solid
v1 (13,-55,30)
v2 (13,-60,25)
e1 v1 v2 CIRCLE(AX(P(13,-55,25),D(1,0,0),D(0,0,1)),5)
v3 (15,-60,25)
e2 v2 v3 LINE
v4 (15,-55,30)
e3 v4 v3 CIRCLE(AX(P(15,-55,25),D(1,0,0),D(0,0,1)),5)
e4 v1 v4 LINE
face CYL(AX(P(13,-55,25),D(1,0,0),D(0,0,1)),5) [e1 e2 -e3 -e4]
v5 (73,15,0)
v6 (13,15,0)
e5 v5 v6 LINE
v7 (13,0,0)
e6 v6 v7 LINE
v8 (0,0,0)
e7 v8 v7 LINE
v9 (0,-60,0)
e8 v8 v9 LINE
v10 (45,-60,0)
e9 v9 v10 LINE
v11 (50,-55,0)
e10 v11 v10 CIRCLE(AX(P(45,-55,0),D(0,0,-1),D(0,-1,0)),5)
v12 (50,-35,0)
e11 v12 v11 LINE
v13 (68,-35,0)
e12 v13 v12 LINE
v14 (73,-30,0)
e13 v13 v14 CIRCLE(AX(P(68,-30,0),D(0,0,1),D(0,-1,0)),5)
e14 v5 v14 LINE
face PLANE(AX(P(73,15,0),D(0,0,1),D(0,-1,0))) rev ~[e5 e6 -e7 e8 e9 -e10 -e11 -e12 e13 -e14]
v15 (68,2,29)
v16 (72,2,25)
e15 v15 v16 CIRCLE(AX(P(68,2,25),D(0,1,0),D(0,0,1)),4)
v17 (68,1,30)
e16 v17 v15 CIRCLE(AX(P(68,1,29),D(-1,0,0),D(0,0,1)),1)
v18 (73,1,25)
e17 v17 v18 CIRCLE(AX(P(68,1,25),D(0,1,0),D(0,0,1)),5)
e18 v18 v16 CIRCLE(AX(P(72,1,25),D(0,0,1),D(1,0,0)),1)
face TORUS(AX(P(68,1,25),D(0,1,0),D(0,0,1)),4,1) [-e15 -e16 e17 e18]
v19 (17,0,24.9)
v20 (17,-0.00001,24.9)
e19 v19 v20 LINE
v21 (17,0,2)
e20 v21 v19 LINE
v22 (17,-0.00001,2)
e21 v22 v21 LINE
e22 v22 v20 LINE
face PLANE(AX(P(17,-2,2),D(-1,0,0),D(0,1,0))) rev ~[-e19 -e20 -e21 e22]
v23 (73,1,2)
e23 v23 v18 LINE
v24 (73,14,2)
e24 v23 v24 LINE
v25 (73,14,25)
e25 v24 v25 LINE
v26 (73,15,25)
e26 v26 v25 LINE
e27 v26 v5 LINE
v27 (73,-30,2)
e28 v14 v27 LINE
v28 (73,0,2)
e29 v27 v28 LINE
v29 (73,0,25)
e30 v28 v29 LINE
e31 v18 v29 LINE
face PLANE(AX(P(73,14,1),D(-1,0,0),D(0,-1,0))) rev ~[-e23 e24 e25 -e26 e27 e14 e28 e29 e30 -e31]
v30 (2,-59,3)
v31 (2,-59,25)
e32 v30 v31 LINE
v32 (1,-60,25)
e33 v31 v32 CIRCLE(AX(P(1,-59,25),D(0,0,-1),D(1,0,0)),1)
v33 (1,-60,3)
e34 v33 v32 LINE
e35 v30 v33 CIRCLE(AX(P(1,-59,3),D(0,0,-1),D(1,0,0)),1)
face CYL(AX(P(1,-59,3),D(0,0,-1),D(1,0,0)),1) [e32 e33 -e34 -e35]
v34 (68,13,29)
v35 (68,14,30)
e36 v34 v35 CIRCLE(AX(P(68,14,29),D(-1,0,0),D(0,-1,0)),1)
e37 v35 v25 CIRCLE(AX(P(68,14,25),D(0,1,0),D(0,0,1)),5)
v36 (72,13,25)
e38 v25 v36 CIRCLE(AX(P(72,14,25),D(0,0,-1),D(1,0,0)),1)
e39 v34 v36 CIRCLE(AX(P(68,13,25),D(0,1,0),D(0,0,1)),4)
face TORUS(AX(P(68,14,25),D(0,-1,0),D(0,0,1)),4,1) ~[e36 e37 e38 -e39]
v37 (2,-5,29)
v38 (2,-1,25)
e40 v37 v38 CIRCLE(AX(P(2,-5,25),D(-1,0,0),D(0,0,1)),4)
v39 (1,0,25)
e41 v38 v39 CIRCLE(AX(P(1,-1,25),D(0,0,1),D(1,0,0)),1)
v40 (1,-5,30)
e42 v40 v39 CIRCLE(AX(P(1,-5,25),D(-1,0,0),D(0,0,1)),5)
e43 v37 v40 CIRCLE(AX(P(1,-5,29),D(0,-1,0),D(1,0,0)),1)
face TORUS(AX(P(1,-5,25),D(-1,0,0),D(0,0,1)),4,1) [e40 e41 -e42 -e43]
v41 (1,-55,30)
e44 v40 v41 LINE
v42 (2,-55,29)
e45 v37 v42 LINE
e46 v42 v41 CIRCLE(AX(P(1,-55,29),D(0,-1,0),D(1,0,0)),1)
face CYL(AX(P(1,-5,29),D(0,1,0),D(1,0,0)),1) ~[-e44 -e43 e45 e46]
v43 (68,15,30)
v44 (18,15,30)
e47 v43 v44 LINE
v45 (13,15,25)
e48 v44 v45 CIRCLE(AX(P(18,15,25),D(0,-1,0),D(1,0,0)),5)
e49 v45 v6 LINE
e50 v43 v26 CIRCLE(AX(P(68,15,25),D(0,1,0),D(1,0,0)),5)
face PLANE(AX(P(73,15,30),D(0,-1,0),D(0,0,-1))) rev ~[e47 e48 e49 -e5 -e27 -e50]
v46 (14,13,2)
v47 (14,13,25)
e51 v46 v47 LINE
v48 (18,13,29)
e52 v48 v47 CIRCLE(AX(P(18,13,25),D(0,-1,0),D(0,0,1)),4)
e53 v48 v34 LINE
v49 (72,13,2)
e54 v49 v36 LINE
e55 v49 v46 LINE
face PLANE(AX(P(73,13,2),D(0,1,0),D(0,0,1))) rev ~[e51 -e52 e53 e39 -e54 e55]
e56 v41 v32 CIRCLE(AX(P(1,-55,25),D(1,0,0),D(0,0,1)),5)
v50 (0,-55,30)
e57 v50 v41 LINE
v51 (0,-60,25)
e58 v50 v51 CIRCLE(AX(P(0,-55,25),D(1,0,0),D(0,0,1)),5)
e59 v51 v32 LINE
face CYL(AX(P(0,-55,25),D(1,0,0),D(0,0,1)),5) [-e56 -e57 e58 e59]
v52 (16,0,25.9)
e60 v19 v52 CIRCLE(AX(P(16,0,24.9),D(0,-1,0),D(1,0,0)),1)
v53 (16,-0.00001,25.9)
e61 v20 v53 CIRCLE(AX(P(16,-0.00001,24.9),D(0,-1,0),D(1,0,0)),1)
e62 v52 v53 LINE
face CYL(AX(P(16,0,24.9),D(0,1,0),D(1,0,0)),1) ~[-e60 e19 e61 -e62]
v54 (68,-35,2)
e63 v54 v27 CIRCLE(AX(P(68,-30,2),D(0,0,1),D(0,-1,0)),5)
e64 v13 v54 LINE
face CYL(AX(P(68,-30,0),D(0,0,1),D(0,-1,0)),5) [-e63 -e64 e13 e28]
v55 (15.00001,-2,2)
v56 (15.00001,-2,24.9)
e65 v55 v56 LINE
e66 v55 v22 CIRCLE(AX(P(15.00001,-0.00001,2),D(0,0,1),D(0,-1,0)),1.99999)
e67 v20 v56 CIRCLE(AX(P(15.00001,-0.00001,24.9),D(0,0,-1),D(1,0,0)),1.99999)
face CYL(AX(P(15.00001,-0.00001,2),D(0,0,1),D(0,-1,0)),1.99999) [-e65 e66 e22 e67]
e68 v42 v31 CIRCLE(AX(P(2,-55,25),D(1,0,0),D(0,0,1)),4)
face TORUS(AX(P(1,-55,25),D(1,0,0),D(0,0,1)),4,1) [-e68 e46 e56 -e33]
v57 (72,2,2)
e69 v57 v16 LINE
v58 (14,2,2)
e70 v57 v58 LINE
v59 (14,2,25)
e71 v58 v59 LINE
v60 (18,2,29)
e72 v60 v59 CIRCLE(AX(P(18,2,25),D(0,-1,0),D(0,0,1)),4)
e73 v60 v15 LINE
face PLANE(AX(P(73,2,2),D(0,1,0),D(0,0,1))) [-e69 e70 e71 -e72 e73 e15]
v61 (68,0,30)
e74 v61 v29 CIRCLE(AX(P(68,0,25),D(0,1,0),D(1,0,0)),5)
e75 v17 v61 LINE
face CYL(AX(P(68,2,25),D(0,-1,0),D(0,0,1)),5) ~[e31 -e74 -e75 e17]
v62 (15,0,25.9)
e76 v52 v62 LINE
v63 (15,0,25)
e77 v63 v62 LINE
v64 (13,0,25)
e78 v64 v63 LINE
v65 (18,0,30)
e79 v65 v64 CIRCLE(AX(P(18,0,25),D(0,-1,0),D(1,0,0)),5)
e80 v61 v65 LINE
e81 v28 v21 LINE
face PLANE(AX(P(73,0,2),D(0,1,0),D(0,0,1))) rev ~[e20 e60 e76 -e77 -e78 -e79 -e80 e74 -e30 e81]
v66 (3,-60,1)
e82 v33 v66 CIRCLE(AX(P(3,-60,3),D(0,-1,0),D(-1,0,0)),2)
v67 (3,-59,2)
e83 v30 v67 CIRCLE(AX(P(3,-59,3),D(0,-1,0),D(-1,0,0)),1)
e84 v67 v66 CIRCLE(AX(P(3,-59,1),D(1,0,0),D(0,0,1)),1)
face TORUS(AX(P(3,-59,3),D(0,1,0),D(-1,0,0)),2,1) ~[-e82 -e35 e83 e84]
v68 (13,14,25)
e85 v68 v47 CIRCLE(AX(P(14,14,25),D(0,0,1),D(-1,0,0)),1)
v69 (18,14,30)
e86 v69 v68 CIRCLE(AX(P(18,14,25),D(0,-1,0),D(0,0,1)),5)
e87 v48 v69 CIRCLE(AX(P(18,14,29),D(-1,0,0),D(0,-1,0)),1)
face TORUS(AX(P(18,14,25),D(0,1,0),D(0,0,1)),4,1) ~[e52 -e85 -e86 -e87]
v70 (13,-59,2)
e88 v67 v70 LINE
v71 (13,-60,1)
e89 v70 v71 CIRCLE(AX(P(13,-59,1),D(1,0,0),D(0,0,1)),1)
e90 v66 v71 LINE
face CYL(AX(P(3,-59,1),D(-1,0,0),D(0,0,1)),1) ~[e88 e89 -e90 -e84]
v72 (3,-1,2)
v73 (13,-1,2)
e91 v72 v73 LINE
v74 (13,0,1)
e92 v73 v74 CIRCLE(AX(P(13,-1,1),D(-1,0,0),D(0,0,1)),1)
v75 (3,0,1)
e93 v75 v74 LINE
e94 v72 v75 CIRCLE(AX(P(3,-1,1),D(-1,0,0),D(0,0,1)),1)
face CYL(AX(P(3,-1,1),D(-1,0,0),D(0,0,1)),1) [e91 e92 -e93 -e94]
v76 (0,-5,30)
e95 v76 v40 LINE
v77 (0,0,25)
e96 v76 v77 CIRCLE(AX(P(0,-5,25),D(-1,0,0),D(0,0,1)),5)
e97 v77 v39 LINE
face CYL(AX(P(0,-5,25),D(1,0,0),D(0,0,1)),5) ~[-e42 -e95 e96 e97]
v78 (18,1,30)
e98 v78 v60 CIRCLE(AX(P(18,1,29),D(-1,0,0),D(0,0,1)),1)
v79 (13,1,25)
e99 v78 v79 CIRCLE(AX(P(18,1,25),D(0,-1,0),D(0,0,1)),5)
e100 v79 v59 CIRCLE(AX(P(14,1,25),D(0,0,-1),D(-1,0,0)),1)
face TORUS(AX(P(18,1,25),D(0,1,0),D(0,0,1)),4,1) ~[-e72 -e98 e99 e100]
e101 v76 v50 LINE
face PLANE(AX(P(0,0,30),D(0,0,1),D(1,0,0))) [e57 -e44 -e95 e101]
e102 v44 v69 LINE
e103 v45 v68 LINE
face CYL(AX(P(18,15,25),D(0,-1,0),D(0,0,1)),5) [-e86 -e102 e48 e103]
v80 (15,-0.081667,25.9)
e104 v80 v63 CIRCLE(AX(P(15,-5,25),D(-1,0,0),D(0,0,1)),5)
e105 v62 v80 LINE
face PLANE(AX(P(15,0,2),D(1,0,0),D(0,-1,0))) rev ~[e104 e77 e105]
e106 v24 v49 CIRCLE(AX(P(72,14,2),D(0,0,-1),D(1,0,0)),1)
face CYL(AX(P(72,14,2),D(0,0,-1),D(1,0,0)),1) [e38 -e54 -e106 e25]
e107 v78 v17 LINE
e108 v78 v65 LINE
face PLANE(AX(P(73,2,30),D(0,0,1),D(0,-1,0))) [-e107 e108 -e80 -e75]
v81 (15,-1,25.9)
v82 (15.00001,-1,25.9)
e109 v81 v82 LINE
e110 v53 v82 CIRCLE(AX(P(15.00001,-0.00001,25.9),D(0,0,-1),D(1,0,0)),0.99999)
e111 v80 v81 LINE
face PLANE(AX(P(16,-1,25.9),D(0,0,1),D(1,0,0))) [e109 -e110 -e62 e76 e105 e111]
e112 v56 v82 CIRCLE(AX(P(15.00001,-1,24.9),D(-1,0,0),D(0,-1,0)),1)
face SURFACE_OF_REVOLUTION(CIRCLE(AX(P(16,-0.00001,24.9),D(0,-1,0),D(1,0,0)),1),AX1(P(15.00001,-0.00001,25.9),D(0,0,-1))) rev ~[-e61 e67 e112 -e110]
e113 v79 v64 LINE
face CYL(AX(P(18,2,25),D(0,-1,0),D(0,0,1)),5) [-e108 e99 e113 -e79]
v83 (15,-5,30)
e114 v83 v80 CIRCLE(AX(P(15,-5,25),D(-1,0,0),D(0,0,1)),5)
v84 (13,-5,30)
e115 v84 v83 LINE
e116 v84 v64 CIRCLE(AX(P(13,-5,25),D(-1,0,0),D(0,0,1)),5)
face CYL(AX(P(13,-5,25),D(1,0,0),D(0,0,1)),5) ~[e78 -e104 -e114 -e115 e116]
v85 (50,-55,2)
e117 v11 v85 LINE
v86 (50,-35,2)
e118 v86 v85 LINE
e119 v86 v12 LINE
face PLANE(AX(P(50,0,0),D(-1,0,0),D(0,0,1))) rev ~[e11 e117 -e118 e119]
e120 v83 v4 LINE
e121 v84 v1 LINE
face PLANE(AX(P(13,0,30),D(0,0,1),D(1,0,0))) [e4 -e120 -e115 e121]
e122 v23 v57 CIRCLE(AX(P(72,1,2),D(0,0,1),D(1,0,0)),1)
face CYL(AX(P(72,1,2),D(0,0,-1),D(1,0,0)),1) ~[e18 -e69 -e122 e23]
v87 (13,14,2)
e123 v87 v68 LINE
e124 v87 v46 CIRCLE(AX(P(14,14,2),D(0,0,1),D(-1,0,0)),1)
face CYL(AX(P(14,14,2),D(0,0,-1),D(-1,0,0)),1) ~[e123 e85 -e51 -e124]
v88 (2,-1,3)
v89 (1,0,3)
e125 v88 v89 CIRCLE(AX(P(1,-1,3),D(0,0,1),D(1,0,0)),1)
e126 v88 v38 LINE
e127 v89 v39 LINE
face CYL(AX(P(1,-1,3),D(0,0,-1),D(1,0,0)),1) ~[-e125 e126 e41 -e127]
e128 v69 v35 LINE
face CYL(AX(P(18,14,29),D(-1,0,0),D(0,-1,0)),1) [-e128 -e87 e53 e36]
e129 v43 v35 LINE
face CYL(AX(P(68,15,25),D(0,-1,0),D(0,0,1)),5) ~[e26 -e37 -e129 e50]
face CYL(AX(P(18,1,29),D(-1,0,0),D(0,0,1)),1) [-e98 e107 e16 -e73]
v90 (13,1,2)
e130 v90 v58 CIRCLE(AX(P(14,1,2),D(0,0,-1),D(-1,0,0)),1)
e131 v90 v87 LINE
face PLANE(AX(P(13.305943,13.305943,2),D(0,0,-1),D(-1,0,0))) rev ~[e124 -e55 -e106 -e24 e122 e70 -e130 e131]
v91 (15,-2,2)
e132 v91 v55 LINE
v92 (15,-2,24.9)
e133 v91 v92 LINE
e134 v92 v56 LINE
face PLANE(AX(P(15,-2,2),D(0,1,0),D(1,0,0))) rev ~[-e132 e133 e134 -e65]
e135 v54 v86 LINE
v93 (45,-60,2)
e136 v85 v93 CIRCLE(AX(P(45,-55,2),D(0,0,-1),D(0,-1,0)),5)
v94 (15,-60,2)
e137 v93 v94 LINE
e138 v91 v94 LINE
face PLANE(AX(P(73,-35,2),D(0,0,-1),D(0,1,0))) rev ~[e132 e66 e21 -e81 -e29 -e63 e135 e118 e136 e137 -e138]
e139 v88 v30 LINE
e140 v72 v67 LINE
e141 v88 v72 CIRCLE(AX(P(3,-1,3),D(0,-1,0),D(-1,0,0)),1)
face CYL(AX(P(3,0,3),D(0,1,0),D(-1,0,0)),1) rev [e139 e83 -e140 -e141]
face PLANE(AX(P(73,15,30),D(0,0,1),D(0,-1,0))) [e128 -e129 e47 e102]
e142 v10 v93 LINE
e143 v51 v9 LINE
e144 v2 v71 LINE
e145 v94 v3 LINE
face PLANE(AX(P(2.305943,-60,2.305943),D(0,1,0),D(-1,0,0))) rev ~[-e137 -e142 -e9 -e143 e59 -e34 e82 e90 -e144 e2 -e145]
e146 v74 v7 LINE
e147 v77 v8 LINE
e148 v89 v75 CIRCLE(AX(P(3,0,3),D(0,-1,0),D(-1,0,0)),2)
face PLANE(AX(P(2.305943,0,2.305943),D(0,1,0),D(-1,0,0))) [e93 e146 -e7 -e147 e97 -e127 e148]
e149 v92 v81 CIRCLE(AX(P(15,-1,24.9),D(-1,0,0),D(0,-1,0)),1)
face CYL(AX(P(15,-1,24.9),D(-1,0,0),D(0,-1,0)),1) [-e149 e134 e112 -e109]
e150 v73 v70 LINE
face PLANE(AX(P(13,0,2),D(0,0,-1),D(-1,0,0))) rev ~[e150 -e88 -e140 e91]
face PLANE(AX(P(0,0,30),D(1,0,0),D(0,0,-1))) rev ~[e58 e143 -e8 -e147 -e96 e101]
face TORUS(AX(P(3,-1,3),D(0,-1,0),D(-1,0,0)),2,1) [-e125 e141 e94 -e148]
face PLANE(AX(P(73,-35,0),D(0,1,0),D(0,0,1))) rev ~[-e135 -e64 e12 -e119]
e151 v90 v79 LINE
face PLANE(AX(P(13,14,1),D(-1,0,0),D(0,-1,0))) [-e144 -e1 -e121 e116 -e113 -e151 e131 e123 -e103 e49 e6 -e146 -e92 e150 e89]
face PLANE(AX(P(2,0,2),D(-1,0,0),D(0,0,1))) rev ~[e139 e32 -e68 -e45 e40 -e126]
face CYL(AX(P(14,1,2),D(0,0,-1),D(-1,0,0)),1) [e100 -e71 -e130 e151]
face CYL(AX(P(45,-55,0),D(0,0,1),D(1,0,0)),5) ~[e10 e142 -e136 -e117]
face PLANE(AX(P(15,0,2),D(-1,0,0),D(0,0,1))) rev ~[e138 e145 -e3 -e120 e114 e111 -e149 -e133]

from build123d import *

# Parameters (mm, degrees)
F0_W         = 2
F0_H         = 2
F0_W_2       = 11
F0_H_2       = 28
F0_W_3       = 35
F1_DEPTH     = 60
F2_ANGLE     = -90
F4_R         = 5
F4_2_R       = 5
F6_DEPTH     = 23.9
F7_R         = 1.99999
F8_T1_DEPTH  = 60
F8_T3_DEPTH  = 23
F8_T5_DEPTH  = 1e-05
F8_T7_DEPTH  = 1e-05
F8_T9_DEPTH  = 50
F8_T12_ANGLE = 90
F8_T14_ANGLE = 90
F8_T16_ANGLE = 90
F8_T18_ANGLE = 90
F8_T20_ANGLE = 90
F8_T21_DEPTH = 50
F8_T23_DEPTH = 22
F8_T25_DEPTH = 10
F8_T28_ANGLE = 90
F8_T30_ANGLE = 90
F8_T32_ANGLE = 90
F8_T34_ANGLE = 90


# Not quite as in the source:
# - a fillet or chamfer that OpenCascade refuses, or shapes differently, is made with other operations: its cross-section is extruded or revolved along the edge and cut away or added
# - a fillet or chamfer is up to 0.001 mm smaller than in the source, because OpenCascade refuses the exact size


with BuildPart() as f1:
    # F0 (on Front) → F1 (new body)
    with BuildSketch(Plane.XZ):
        with Locations((1, 1)):
            Rectangle(F0_W, F0_H)
        with Locations((7.5, 1)):
            Rectangle(F0_W_2, F0_H)
        with Locations((1, 16)):
            Rectangle(F0_W, F0_H_2)
        with Locations((14, 1)):
            Rectangle(F0_W, F0_H)
        with Locations((32.5, 1)):
            Rectangle(F0_W_3, F0_H)
        with Locations((14, 16)):
            Rectangle(F0_W, F0_H_2)
    extrude(amount=F1_DEPTH)


with BuildPart() as f2_1:
    # F2: copy of F1
    add(f1.part.rotate(Axis((15, 0, 16), (0, 0, 1)), F2_ANGLE))


with BuildPart() as f2_1_1:
    # F3: moved
    add(f2_1.part.moved(Location((58, 0, 0))))

    # F4#2
    f4_2_edges = [f2_1_1.edges().sort_by_distance(p)[0] for p in [
        (73, 1, 30),
        (73, 14, 30),
        (13, 14, 30),
        (13, 1, 30),
        (73, -35, 1),
    ]]
    fillet(f4_2_edges, radius=F4_2_R)


with BuildPart() as f1_1:
    add(f1.part)

    # F4
    f4_edges = [f1_1.edges().sort_by_distance(p)[0] for p in [
        (14, 0, 30),
        (1, 0, 30),
        (14, -60, 30),
        (1, -60, 30),
        (50, -60, 1),
    ]]
    fillet(f4_edges, radius=F4_R)

    add(f2_1_1.part)  # F6 merges F2_1
    # F5 (on face) → F6 (join)
    with BuildSketch(Plane.XY.offset(2)):
        Polygon((16.8020091951, 0), (15, 0), (15, -2), (17, -2), (17, 0), align=None)
    extrude(amount=F6_DEPTH)

    # F7 (radius 2 in the source; OpenCascade refuses exactly that, so slightly less here)
    f7_edges = [f1_1.edges().sort_by_distance(p)[0] for p in [
        (17, -2, 13.95),
    ]]
    fillet(f7_edges, radius=F7_R)

    # F8: fillet of radius 1 on 19 edges, made by hand

    # F8_s2 → F8_t1 (join)
    with BuildSketch(Plane.XZ):
        with BuildLine():
            ThreePointArc((2, 3), (2.2928932188, 2.2928932188), (3, 2))
            Line((3, 2), (2, 2))
            Line((2, 2), (2, 3))
        make_face()
    extrude(amount=F8_T1_DEPTH)

    # F8_s4 → F8_t3 (cut)
    with BuildSketch(Plane.XY.offset(2)):
        with BuildLine():
            ThreePointArc((13, 1), (13.2928932188, 1.7071067812), (14, 2))
            Line((14, 2), (13, 2))
            Line((13, 2), (13, 1))
        make_face()
        with BuildLine():
            ThreePointArc((73, 14), (72.7071067812, 13.2928932188), (72, 13))
            Line((72, 13), (73, 13))
            Line((73, 13), (73, 14))
        make_face()
        with BuildLine():
            ThreePointArc((73, 1), (72.7071067812, 1.7071067812), (72, 2))
            Line((72, 2), (73, 2))
            Line((73, 2), (73, 1))
        make_face()
        with BuildLine():
            ThreePointArc((13, 14), (13.2928932188, 13.2928932188), (14, 13))
            Line((14, 13), (13, 13))
            Line((13, 13), (13, 14))
        make_face()
    extrude(amount=F8_T3_DEPTH, mode=Mode.SUBTRACT)

    # F8_s6 → F8_t5 (cut)
    with BuildSketch(Plane.YZ.offset(15)):
        with BuildLine():
            ThreePointArc((-2, 24.9), (-1.7071067812, 25.6071067812), (-1, 25.9))
            Line((-1, 25.9), (-2, 25.9))
            Line((-2, 25.9), (-2, 24.9))
        make_face()
    extrude(amount=F8_T5_DEPTH, mode=Mode.SUBTRACT)

    # F8_s8 → F8_t7 (cut)
    with BuildSketch(Plane.XZ):
        with BuildLine():
            ThreePointArc((17, 24.9), (16.7071067812, 25.6071067812), (16, 25.9))
            Line((16, 25.9), (17, 25.9))
            Line((17, 25.9), (17, 24.9))
        make_face()
    extrude(amount=F8_T7_DEPTH, mode=Mode.SUBTRACT)

    # F8_s10 → F8_t9 (cut)
    with BuildSketch(Plane.YZ.offset(18)):
        with BuildLine():
            ThreePointArc((13, 29), (13.2928932188, 29.7071067812), (14, 30))
            Line((14, 30), (13, 30))
            Line((13, 30), (13, 29))
        make_face()
        with BuildLine():
            ThreePointArc((1, 30), (1.7071067812, 29.7071067812), (2, 29))
            Line((2, 29), (2, 30))
            Line((2, 30), (1, 30))
        make_face()
    extrude(amount=F8_T9_DEPTH, mode=Mode.SUBTRACT)

    # F8_s11 → F8_t12 (revolve, cut)
    with BuildSketch(Plane.XZ.offset(1e-05)):
        with BuildLine():
            ThreePointArc((17, 24.9), (16.7071067812, 25.6071067812), (16, 25.9))
            Line((16, 25.9), (17, 25.9))
            Line((17, 25.9), (17, 24.9))
        make_face()
    revolve(axis=Axis((15.00001, -1e-05, 25.9), (0, 0, -1)), revolution_arc=F8_T12_ANGLE, mode=Mode.SUBTRACT)

    # F8_s13 → F8_t14 (revolve, cut)
    with BuildSketch(Plane.YZ.offset(68)):
        with BuildLine():
            ThreePointArc((1, 30), (1.7071067812, 29.7071067812), (2, 29))
            Line((2, 29), (2, 30))
            Line((2, 30), (1, 30))
        make_face()
    revolve(axis=Axis((68, 2, 25), (0, 1, 0)), revolution_arc=F8_T14_ANGLE, mode=Mode.SUBTRACT)

    # F8_s15 → F8_t16 (revolve, cut)
    with BuildSketch(Plane.YZ.offset(18)):
        with BuildLine():
            ThreePointArc((1, 30), (1.7071067812, 29.7071067812), (2, 29))
            Line((2, 29), (2, 30))
            Line((2, 30), (1, 30))
        make_face()
    revolve(axis=Axis((18, 2, 25), (0, -1, 0)), revolution_arc=F8_T16_ANGLE, mode=Mode.SUBTRACT)

    # F8_s17 → F8_t18 (revolve, cut)
    with BuildSketch(Plane.YZ.offset(68)):
        with BuildLine():
            ThreePointArc((14, 30), (13.2928932188, 29.7071067812), (13, 29))
            Line((13, 29), (13, 30))
            Line((13, 30), (14, 30))
        make_face()
    revolve(axis=Axis((68, 13, 25), (0, 1, 0)), revolution_arc=F8_T18_ANGLE, mode=Mode.SUBTRACT)

    # F8_s19 → F8_t20 (revolve, cut)
    with BuildSketch(Plane.YZ.offset(18)):
        with BuildLine():
            ThreePointArc((13, 29), (13.2928932188, 29.7071067812), (14, 30))
            Line((14, 30), (13, 30))
            Line((13, 30), (13, 29))
        make_face()
    revolve(axis=Axis((18, 13, 25), (0, -1, 0)), revolution_arc=F8_T20_ANGLE, mode=Mode.SUBTRACT)

    # F8_s22 → F8_t21 (cut)
    with BuildSketch(Plane.XZ.offset(5)):
        with BuildLine():
            ThreePointArc((2, 29), (1.7071067812, 29.7071067812), (1, 30))
            Line((1, 30), (2, 30))
            Line((2, 30), (2, 29))
        make_face()
    extrude(amount=F8_T21_DEPTH, mode=Mode.SUBTRACT)

    # F8_s24 → F8_t23 (cut)
    with BuildSketch(Plane.XY.offset(3)):
        with BuildLine():
            ThreePointArc((2, -1), (1.7071067812, -0.2928932188), (1, 0))
            Line((1, 0), (2, 0))
            Line((2, 0), (2, -1))
        make_face()
        with BuildLine():
            ThreePointArc((2, -59), (1.7071067812, -59.7071067812), (1, -60))
            Line((1, -60), (2, -60))
            Line((2, -60), (2, -59))
        make_face()
    extrude(amount=F8_T23_DEPTH, mode=Mode.SUBTRACT)

    # F8_s26 → F8_t25 (cut)
    with BuildSketch(Plane.YZ.offset(3)):
        with BuildLine():
            ThreePointArc((-59, 2), (-59.7071067812, 1.7071067812), (-60, 1))
            Line((-60, 1), (-60, 2))
            Line((-60, 2), (-59, 2))
        make_face()
        with BuildLine():
            ThreePointArc((-1, 2), (-0.2928932188, 1.7071067812), (0, 1))
            Line((0, 1), (0, 2))
            Line((0, 2), (-1, 2))
        make_face()
    extrude(amount=F8_T25_DEPTH, mode=Mode.SUBTRACT)

    # F8_s27 → F8_t28 (revolve, cut)
    with BuildSketch(Plane.XZ.offset(5)):
        with BuildLine():
            ThreePointArc((2, 29), (1.7071067812, 29.7071067812), (1, 30))
            Line((1, 30), (2, 30))
            Line((2, 30), (2, 29))
        make_face()
    revolve(axis=Axis((2, -5, 25), (-1, 0, 0)), revolution_arc=F8_T28_ANGLE, mode=Mode.SUBTRACT)

    # F8_s29 → F8_t30 (revolve, cut)
    with BuildSketch(Plane.XZ.offset(55)):
        with BuildLine():
            ThreePointArc((1, 30), (1.7071067812, 29.7071067812), (2, 29))
            Line((2, 29), (2, 30))
            Line((2, 30), (1, 30))
        make_face()
    revolve(axis=Axis((2, -55, 25), (1, 0, 0)), revolution_arc=F8_T30_ANGLE, mode=Mode.SUBTRACT)

    # F8_s31 → F8_t32 (revolve, cut)
    with BuildSketch(Plane.XY.offset(3)):
        with BuildLine():
            ThreePointArc((2, -1), (1.7071067812, -0.2928932188), (1, 0))
            Line((1, 0), (2, 0))
            Line((2, 0), (2, -1))
        make_face()
    revolve(axis=Axis((3, 0, 3), (0, -1, 0)), revolution_arc=F8_T32_ANGLE, mode=Mode.SUBTRACT)

    # F8_s33 → F8_t34 (revolve, cut)
    with BuildSketch(Plane.XY.offset(3)):
        with BuildLine():
            ThreePointArc((2, -59), (1.7071067812, -59.7071067812), (1, -60))
            Line((1, -60), (2, -60))
            Line((2, -60), (2, -59))
        make_face()
    revolve(axis=Axis((3, -60, 3), (0, -1, 0)), revolution_arc=F8_T34_ANGLE, mode=Mode.SUBTRACT)


solid = f1_1.part
